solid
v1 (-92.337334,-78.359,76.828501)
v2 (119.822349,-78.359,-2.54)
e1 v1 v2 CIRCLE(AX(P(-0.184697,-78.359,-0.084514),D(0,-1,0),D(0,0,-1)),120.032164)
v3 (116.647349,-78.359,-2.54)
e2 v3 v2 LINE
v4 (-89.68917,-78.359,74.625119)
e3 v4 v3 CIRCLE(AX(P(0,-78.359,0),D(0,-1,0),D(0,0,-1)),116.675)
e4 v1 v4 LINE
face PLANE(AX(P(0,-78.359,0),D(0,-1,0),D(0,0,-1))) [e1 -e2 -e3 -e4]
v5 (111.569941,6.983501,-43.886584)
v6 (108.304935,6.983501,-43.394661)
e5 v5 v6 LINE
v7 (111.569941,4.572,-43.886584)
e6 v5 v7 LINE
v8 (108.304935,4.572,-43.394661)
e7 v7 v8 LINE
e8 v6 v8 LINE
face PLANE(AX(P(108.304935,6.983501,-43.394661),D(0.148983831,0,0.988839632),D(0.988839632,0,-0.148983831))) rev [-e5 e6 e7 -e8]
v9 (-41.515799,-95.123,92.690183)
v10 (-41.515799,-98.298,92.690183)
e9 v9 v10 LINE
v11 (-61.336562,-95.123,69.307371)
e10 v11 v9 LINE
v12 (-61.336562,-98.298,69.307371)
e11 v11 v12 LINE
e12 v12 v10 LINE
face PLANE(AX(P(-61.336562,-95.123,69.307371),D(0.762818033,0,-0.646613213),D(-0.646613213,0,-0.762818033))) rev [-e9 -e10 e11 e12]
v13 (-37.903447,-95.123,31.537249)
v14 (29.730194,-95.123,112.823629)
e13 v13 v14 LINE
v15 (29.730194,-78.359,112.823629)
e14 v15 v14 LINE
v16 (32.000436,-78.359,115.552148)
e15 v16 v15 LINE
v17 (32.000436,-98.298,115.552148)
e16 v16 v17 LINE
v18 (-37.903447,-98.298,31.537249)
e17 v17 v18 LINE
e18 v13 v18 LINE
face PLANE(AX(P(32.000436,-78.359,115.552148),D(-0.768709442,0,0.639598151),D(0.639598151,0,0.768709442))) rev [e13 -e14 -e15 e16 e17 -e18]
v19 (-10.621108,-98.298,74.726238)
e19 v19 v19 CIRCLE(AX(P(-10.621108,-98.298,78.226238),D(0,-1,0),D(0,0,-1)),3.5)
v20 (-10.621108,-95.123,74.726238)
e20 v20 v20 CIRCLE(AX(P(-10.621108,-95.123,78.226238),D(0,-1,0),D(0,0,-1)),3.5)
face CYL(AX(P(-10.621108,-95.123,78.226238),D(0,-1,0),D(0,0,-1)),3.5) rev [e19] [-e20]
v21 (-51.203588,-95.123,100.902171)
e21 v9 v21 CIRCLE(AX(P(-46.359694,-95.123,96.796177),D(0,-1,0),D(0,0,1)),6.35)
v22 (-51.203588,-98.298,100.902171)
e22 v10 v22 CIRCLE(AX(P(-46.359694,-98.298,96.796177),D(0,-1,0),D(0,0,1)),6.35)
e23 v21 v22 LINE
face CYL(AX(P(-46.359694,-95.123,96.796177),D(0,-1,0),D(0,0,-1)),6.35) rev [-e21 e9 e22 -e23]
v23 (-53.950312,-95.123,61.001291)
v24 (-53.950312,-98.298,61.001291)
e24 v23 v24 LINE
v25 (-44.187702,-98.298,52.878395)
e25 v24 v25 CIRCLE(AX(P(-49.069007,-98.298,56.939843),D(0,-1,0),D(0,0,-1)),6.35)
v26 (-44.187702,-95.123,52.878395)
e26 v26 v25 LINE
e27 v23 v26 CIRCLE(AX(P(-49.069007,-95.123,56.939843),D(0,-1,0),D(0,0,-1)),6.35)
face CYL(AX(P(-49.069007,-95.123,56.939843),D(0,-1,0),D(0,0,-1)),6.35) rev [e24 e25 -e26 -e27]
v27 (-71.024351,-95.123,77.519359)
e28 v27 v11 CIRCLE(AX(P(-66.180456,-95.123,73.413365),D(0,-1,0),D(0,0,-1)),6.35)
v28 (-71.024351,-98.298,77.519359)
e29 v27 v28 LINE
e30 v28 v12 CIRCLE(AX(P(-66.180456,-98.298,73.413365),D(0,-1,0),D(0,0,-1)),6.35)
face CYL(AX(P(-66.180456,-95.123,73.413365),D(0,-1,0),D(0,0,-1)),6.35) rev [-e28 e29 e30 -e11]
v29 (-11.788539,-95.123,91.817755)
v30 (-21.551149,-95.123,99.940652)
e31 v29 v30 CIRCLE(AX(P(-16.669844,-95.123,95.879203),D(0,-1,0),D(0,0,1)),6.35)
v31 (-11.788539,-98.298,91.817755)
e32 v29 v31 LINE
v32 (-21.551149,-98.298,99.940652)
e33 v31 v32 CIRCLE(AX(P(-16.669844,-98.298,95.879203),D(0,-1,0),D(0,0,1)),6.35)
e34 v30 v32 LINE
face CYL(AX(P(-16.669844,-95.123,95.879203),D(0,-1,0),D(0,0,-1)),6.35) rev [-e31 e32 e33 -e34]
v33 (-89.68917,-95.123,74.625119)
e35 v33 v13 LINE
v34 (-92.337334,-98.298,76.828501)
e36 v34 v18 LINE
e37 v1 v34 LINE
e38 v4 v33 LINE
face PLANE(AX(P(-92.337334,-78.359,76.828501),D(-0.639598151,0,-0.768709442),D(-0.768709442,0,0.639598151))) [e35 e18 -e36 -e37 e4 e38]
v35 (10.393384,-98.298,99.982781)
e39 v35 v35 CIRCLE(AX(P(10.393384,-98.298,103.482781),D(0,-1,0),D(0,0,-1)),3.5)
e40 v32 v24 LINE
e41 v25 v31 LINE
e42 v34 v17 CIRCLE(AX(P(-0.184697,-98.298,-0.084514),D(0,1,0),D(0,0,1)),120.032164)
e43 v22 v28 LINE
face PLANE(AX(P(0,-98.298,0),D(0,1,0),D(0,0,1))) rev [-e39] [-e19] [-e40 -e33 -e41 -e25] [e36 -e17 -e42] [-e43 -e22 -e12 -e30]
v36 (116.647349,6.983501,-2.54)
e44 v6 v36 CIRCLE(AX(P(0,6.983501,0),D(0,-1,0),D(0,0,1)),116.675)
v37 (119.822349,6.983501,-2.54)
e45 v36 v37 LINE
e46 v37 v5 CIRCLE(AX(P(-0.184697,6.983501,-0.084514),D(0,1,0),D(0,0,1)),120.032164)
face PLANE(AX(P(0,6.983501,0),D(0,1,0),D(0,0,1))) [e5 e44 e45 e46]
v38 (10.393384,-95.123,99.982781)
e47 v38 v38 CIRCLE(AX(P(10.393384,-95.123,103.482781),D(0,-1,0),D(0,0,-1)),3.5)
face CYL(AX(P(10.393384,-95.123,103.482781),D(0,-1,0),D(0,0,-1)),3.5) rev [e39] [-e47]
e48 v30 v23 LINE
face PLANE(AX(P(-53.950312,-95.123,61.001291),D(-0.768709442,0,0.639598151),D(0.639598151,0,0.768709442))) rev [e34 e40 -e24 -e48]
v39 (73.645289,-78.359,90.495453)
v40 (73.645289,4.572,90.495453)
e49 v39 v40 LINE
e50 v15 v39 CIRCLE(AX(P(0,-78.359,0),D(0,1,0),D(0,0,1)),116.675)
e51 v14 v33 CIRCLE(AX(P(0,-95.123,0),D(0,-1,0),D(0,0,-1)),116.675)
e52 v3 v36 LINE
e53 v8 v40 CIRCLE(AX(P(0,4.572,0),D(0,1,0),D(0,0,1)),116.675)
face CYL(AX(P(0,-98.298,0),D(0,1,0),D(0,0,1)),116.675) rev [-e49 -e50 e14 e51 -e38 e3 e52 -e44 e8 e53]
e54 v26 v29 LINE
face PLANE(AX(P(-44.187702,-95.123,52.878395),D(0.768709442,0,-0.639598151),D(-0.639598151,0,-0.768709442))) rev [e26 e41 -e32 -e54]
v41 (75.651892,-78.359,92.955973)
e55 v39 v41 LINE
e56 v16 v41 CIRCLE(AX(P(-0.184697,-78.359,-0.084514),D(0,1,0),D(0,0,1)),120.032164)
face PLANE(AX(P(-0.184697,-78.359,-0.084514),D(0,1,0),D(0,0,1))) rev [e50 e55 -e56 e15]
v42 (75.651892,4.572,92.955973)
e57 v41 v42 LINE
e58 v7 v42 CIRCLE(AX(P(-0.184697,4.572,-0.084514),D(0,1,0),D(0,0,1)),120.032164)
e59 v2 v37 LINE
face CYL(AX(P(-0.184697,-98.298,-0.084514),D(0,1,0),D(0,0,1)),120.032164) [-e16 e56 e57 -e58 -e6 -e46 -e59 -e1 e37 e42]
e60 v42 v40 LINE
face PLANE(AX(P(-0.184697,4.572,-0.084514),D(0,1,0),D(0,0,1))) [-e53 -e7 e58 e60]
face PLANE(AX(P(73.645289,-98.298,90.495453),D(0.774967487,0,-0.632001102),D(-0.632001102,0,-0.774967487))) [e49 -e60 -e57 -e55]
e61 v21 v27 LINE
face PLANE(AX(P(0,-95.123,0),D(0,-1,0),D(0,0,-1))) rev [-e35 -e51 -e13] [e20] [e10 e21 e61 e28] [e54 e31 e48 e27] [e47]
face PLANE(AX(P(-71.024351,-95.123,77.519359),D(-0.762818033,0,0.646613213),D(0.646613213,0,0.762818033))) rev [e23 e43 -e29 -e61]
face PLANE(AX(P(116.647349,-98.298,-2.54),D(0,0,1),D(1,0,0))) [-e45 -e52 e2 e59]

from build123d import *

# Parameters (mm, degrees)
BASE_FLANGE1_DEPTH  = 98.298
CUT_EXTRUDE1_START  = -19.939
CUT_EXTRUDE1_DEPTH  = 19.939
BOSS_EXTRUDE3_START = -3.175
SKETCH13_R          = 3.5
BOSS_EXTRUDE3_DEPTH = 3.175
BOSS_EXTRUDE4_START = 4.572
BOSS_EXTRUDE4_DEPTH = 4.572
BOSS_EXTRUDE5_START = 2.4115014
BOSS_EXTRUDE5_DEPTH = 2.4115014


# Sheet-metal steps are written as plain solids
with BuildPart() as part:
    # Sketch3 → Base-Flange1 (new body)
    with BuildSketch(Plane(origin=(0, 0, 0), x_dir=(1, 0, 0), z_dir=(0, 1, 0))):
        with BuildLine():
            Line((116.647348933, 2.54), (119.822348933, 2.54))
            ThreePointArc((119.822348933, 2.54), (-109.127582861, 50.474671088), (75.651891683, -92.955973295))
            Line((75.651891683, -92.955973295), (73.645289253, -90.495452836))
            ThreePointArc((73.645289253, -90.495452836), (-105.909021844, 48.952371802), (116.647348933, 2.54))
        make_face()
    extrude(amount=-BASE_FLANGE1_DEPTH)

    # Sketch11 → Cut-Extrude1 (cut)
    with BuildSketch(Plane.XZ.offset(98.298).offset(CUT_EXTRUDE1_START)):
        with BuildLine():
            Line((32.000435674, 115.55214828), (29.730194096, 112.823628607))
            ThreePointArc((29.730194096, 112.823628607), (52.879669985, 104.003827407), (73.645289253, 90.495452836))
            Line((73.645289253, 90.495452836), (75.651891683, 92.955973295))
            ThreePointArc((75.651891683, 92.955973295), (54.995189309, 106.512393046), (32.000435674, 115.55214828))
        make_face()
        with BuildLine():
            Line((-92.337333522, 76.828501251), (-89.68916988, 74.625119225))
            ThreePointArc((-89.68916988, 74.625119225), (-40.869300957, -109.282916562), (116.647348933, -2.54))
            Line((116.647348933, -2.54), (119.822348933, -2.54))
            ThreePointArc((119.822348933, -2.54), (-42.24188113, -112.507437016), (-92.337333522, 76.828501251))
        make_face()
    extrude(amount=CUT_EXTRUDE1_DEPTH, mode=Mode.SUBTRACT)

    # Sketch13 → Boss-Extrude3 (add)
    with BuildSketch(Plane.XZ.offset(98.298).offset(BOSS_EXTRUDE3_START)):
        with BuildLine():
            Line((-37.903446615, 31.537248793), (29.730194096, 112.823628607))
            ThreePointArc((29.730194096, 112.823628607), (-35.546465704, 111.128323973), (-89.68916988, 74.625119225))
            Line((-89.68916988, 74.625119225), (-37.903446615, 31.537248793))
        make_face()
        with Locations(Location((-10.621108202, 78.226237974, 0), (0, 0, 270))):
            Circle(SKETCH13_R, mode=Mode.SUBTRACT)
        with Locations(Location((10.39338393, 103.482781479, 0), (0, 0, 270))):
            Circle(SKETCH13_R, mode=Mode.SUBTRACT)
        with BuildLine():
            Line((-53.950312206, 61.001291051), (-21.551148637, 99.940651521))
            ThreePointArc((-21.551148637, 99.940651521), (-12.608395426, 100.76050822), (-11.788538727, 91.817755009))
            Line((-11.788538727, 91.817755009), (-44.187702296, 52.878394539))
            ThreePointArc((-44.187702296, 52.878394539), (-53.130455507, 52.05853784), (-53.950312206, 61.001291051))
        make_face(mode=Mode.SUBTRACT)
        with BuildLine():
            Line((-71.024350753, 77.519358691), (-51.203588088, 100.902170675))
            ThreePointArc((-51.203588088, 100.902170675), (-42.25369967, 101.640071282), (-41.515799064, 92.690182864))
            Line((-41.515799064, 92.690182864), (-61.336561728, 69.30737088))
            ThreePointArc((-61.336561728, 69.30737088), (-70.286450146, 68.569470273), (-71.024350753, 77.519358691))
        make_face(mode=Mode.SUBTRACT)
    extrude(amount=BOSS_EXTRUDE3_DEPTH)

    # Sketch14 → Boss-Extrude4 (add)
    with BuildSketch(Plane(origin=(0, 0, 0), x_dir=(1, 0, 0), z_dir=(0, 1, 0)).offset(BOSS_EXTRUDE4_START)):
        with BuildLine():
            Line((116.647348933, 2.54), (119.822348933, 2.54))
            ThreePointArc((119.822348933, 2.54), (-109.127582861, 50.474671088), (75.651891683, -92.955973295))
            Line((75.651891683, -92.955973295), (73.645289253, -90.495452836))
            ThreePointArc((73.645289253, -90.495452836), (-105.909021844, 48.952371802), (116.647348933, 2.54))
        make_face()
    extrude(amount=-BOSS_EXTRUDE4_DEPTH)

    # Sketch15 → Boss-Extrude5 (add)
    with BuildSketch(Plane(origin=(0, 4.572, 0), x_dir=(1, 0, 0), z_dir=(0, 1, 0)).offset(BOSS_EXTRUDE5_START)):
        with BuildLine():
            Line((116.647348933, 2.54), (119.822348933, 2.54))
            ThreePointArc((119.822348933, 2.54), (117.525772125, 23.578469398), (111.569940957, 43.886584395))
            Line((111.569940957, 43.886584395), (108.304935184, 43.394661284))
            ThreePointArc((108.304935184, 43.394661284), (114.316045984, 23.343034156), (116.647348933, 2.54))
        make_face()
    extrude(amount=-BOSS_EXTRUDE5_DEPTH)


solid = part.part
